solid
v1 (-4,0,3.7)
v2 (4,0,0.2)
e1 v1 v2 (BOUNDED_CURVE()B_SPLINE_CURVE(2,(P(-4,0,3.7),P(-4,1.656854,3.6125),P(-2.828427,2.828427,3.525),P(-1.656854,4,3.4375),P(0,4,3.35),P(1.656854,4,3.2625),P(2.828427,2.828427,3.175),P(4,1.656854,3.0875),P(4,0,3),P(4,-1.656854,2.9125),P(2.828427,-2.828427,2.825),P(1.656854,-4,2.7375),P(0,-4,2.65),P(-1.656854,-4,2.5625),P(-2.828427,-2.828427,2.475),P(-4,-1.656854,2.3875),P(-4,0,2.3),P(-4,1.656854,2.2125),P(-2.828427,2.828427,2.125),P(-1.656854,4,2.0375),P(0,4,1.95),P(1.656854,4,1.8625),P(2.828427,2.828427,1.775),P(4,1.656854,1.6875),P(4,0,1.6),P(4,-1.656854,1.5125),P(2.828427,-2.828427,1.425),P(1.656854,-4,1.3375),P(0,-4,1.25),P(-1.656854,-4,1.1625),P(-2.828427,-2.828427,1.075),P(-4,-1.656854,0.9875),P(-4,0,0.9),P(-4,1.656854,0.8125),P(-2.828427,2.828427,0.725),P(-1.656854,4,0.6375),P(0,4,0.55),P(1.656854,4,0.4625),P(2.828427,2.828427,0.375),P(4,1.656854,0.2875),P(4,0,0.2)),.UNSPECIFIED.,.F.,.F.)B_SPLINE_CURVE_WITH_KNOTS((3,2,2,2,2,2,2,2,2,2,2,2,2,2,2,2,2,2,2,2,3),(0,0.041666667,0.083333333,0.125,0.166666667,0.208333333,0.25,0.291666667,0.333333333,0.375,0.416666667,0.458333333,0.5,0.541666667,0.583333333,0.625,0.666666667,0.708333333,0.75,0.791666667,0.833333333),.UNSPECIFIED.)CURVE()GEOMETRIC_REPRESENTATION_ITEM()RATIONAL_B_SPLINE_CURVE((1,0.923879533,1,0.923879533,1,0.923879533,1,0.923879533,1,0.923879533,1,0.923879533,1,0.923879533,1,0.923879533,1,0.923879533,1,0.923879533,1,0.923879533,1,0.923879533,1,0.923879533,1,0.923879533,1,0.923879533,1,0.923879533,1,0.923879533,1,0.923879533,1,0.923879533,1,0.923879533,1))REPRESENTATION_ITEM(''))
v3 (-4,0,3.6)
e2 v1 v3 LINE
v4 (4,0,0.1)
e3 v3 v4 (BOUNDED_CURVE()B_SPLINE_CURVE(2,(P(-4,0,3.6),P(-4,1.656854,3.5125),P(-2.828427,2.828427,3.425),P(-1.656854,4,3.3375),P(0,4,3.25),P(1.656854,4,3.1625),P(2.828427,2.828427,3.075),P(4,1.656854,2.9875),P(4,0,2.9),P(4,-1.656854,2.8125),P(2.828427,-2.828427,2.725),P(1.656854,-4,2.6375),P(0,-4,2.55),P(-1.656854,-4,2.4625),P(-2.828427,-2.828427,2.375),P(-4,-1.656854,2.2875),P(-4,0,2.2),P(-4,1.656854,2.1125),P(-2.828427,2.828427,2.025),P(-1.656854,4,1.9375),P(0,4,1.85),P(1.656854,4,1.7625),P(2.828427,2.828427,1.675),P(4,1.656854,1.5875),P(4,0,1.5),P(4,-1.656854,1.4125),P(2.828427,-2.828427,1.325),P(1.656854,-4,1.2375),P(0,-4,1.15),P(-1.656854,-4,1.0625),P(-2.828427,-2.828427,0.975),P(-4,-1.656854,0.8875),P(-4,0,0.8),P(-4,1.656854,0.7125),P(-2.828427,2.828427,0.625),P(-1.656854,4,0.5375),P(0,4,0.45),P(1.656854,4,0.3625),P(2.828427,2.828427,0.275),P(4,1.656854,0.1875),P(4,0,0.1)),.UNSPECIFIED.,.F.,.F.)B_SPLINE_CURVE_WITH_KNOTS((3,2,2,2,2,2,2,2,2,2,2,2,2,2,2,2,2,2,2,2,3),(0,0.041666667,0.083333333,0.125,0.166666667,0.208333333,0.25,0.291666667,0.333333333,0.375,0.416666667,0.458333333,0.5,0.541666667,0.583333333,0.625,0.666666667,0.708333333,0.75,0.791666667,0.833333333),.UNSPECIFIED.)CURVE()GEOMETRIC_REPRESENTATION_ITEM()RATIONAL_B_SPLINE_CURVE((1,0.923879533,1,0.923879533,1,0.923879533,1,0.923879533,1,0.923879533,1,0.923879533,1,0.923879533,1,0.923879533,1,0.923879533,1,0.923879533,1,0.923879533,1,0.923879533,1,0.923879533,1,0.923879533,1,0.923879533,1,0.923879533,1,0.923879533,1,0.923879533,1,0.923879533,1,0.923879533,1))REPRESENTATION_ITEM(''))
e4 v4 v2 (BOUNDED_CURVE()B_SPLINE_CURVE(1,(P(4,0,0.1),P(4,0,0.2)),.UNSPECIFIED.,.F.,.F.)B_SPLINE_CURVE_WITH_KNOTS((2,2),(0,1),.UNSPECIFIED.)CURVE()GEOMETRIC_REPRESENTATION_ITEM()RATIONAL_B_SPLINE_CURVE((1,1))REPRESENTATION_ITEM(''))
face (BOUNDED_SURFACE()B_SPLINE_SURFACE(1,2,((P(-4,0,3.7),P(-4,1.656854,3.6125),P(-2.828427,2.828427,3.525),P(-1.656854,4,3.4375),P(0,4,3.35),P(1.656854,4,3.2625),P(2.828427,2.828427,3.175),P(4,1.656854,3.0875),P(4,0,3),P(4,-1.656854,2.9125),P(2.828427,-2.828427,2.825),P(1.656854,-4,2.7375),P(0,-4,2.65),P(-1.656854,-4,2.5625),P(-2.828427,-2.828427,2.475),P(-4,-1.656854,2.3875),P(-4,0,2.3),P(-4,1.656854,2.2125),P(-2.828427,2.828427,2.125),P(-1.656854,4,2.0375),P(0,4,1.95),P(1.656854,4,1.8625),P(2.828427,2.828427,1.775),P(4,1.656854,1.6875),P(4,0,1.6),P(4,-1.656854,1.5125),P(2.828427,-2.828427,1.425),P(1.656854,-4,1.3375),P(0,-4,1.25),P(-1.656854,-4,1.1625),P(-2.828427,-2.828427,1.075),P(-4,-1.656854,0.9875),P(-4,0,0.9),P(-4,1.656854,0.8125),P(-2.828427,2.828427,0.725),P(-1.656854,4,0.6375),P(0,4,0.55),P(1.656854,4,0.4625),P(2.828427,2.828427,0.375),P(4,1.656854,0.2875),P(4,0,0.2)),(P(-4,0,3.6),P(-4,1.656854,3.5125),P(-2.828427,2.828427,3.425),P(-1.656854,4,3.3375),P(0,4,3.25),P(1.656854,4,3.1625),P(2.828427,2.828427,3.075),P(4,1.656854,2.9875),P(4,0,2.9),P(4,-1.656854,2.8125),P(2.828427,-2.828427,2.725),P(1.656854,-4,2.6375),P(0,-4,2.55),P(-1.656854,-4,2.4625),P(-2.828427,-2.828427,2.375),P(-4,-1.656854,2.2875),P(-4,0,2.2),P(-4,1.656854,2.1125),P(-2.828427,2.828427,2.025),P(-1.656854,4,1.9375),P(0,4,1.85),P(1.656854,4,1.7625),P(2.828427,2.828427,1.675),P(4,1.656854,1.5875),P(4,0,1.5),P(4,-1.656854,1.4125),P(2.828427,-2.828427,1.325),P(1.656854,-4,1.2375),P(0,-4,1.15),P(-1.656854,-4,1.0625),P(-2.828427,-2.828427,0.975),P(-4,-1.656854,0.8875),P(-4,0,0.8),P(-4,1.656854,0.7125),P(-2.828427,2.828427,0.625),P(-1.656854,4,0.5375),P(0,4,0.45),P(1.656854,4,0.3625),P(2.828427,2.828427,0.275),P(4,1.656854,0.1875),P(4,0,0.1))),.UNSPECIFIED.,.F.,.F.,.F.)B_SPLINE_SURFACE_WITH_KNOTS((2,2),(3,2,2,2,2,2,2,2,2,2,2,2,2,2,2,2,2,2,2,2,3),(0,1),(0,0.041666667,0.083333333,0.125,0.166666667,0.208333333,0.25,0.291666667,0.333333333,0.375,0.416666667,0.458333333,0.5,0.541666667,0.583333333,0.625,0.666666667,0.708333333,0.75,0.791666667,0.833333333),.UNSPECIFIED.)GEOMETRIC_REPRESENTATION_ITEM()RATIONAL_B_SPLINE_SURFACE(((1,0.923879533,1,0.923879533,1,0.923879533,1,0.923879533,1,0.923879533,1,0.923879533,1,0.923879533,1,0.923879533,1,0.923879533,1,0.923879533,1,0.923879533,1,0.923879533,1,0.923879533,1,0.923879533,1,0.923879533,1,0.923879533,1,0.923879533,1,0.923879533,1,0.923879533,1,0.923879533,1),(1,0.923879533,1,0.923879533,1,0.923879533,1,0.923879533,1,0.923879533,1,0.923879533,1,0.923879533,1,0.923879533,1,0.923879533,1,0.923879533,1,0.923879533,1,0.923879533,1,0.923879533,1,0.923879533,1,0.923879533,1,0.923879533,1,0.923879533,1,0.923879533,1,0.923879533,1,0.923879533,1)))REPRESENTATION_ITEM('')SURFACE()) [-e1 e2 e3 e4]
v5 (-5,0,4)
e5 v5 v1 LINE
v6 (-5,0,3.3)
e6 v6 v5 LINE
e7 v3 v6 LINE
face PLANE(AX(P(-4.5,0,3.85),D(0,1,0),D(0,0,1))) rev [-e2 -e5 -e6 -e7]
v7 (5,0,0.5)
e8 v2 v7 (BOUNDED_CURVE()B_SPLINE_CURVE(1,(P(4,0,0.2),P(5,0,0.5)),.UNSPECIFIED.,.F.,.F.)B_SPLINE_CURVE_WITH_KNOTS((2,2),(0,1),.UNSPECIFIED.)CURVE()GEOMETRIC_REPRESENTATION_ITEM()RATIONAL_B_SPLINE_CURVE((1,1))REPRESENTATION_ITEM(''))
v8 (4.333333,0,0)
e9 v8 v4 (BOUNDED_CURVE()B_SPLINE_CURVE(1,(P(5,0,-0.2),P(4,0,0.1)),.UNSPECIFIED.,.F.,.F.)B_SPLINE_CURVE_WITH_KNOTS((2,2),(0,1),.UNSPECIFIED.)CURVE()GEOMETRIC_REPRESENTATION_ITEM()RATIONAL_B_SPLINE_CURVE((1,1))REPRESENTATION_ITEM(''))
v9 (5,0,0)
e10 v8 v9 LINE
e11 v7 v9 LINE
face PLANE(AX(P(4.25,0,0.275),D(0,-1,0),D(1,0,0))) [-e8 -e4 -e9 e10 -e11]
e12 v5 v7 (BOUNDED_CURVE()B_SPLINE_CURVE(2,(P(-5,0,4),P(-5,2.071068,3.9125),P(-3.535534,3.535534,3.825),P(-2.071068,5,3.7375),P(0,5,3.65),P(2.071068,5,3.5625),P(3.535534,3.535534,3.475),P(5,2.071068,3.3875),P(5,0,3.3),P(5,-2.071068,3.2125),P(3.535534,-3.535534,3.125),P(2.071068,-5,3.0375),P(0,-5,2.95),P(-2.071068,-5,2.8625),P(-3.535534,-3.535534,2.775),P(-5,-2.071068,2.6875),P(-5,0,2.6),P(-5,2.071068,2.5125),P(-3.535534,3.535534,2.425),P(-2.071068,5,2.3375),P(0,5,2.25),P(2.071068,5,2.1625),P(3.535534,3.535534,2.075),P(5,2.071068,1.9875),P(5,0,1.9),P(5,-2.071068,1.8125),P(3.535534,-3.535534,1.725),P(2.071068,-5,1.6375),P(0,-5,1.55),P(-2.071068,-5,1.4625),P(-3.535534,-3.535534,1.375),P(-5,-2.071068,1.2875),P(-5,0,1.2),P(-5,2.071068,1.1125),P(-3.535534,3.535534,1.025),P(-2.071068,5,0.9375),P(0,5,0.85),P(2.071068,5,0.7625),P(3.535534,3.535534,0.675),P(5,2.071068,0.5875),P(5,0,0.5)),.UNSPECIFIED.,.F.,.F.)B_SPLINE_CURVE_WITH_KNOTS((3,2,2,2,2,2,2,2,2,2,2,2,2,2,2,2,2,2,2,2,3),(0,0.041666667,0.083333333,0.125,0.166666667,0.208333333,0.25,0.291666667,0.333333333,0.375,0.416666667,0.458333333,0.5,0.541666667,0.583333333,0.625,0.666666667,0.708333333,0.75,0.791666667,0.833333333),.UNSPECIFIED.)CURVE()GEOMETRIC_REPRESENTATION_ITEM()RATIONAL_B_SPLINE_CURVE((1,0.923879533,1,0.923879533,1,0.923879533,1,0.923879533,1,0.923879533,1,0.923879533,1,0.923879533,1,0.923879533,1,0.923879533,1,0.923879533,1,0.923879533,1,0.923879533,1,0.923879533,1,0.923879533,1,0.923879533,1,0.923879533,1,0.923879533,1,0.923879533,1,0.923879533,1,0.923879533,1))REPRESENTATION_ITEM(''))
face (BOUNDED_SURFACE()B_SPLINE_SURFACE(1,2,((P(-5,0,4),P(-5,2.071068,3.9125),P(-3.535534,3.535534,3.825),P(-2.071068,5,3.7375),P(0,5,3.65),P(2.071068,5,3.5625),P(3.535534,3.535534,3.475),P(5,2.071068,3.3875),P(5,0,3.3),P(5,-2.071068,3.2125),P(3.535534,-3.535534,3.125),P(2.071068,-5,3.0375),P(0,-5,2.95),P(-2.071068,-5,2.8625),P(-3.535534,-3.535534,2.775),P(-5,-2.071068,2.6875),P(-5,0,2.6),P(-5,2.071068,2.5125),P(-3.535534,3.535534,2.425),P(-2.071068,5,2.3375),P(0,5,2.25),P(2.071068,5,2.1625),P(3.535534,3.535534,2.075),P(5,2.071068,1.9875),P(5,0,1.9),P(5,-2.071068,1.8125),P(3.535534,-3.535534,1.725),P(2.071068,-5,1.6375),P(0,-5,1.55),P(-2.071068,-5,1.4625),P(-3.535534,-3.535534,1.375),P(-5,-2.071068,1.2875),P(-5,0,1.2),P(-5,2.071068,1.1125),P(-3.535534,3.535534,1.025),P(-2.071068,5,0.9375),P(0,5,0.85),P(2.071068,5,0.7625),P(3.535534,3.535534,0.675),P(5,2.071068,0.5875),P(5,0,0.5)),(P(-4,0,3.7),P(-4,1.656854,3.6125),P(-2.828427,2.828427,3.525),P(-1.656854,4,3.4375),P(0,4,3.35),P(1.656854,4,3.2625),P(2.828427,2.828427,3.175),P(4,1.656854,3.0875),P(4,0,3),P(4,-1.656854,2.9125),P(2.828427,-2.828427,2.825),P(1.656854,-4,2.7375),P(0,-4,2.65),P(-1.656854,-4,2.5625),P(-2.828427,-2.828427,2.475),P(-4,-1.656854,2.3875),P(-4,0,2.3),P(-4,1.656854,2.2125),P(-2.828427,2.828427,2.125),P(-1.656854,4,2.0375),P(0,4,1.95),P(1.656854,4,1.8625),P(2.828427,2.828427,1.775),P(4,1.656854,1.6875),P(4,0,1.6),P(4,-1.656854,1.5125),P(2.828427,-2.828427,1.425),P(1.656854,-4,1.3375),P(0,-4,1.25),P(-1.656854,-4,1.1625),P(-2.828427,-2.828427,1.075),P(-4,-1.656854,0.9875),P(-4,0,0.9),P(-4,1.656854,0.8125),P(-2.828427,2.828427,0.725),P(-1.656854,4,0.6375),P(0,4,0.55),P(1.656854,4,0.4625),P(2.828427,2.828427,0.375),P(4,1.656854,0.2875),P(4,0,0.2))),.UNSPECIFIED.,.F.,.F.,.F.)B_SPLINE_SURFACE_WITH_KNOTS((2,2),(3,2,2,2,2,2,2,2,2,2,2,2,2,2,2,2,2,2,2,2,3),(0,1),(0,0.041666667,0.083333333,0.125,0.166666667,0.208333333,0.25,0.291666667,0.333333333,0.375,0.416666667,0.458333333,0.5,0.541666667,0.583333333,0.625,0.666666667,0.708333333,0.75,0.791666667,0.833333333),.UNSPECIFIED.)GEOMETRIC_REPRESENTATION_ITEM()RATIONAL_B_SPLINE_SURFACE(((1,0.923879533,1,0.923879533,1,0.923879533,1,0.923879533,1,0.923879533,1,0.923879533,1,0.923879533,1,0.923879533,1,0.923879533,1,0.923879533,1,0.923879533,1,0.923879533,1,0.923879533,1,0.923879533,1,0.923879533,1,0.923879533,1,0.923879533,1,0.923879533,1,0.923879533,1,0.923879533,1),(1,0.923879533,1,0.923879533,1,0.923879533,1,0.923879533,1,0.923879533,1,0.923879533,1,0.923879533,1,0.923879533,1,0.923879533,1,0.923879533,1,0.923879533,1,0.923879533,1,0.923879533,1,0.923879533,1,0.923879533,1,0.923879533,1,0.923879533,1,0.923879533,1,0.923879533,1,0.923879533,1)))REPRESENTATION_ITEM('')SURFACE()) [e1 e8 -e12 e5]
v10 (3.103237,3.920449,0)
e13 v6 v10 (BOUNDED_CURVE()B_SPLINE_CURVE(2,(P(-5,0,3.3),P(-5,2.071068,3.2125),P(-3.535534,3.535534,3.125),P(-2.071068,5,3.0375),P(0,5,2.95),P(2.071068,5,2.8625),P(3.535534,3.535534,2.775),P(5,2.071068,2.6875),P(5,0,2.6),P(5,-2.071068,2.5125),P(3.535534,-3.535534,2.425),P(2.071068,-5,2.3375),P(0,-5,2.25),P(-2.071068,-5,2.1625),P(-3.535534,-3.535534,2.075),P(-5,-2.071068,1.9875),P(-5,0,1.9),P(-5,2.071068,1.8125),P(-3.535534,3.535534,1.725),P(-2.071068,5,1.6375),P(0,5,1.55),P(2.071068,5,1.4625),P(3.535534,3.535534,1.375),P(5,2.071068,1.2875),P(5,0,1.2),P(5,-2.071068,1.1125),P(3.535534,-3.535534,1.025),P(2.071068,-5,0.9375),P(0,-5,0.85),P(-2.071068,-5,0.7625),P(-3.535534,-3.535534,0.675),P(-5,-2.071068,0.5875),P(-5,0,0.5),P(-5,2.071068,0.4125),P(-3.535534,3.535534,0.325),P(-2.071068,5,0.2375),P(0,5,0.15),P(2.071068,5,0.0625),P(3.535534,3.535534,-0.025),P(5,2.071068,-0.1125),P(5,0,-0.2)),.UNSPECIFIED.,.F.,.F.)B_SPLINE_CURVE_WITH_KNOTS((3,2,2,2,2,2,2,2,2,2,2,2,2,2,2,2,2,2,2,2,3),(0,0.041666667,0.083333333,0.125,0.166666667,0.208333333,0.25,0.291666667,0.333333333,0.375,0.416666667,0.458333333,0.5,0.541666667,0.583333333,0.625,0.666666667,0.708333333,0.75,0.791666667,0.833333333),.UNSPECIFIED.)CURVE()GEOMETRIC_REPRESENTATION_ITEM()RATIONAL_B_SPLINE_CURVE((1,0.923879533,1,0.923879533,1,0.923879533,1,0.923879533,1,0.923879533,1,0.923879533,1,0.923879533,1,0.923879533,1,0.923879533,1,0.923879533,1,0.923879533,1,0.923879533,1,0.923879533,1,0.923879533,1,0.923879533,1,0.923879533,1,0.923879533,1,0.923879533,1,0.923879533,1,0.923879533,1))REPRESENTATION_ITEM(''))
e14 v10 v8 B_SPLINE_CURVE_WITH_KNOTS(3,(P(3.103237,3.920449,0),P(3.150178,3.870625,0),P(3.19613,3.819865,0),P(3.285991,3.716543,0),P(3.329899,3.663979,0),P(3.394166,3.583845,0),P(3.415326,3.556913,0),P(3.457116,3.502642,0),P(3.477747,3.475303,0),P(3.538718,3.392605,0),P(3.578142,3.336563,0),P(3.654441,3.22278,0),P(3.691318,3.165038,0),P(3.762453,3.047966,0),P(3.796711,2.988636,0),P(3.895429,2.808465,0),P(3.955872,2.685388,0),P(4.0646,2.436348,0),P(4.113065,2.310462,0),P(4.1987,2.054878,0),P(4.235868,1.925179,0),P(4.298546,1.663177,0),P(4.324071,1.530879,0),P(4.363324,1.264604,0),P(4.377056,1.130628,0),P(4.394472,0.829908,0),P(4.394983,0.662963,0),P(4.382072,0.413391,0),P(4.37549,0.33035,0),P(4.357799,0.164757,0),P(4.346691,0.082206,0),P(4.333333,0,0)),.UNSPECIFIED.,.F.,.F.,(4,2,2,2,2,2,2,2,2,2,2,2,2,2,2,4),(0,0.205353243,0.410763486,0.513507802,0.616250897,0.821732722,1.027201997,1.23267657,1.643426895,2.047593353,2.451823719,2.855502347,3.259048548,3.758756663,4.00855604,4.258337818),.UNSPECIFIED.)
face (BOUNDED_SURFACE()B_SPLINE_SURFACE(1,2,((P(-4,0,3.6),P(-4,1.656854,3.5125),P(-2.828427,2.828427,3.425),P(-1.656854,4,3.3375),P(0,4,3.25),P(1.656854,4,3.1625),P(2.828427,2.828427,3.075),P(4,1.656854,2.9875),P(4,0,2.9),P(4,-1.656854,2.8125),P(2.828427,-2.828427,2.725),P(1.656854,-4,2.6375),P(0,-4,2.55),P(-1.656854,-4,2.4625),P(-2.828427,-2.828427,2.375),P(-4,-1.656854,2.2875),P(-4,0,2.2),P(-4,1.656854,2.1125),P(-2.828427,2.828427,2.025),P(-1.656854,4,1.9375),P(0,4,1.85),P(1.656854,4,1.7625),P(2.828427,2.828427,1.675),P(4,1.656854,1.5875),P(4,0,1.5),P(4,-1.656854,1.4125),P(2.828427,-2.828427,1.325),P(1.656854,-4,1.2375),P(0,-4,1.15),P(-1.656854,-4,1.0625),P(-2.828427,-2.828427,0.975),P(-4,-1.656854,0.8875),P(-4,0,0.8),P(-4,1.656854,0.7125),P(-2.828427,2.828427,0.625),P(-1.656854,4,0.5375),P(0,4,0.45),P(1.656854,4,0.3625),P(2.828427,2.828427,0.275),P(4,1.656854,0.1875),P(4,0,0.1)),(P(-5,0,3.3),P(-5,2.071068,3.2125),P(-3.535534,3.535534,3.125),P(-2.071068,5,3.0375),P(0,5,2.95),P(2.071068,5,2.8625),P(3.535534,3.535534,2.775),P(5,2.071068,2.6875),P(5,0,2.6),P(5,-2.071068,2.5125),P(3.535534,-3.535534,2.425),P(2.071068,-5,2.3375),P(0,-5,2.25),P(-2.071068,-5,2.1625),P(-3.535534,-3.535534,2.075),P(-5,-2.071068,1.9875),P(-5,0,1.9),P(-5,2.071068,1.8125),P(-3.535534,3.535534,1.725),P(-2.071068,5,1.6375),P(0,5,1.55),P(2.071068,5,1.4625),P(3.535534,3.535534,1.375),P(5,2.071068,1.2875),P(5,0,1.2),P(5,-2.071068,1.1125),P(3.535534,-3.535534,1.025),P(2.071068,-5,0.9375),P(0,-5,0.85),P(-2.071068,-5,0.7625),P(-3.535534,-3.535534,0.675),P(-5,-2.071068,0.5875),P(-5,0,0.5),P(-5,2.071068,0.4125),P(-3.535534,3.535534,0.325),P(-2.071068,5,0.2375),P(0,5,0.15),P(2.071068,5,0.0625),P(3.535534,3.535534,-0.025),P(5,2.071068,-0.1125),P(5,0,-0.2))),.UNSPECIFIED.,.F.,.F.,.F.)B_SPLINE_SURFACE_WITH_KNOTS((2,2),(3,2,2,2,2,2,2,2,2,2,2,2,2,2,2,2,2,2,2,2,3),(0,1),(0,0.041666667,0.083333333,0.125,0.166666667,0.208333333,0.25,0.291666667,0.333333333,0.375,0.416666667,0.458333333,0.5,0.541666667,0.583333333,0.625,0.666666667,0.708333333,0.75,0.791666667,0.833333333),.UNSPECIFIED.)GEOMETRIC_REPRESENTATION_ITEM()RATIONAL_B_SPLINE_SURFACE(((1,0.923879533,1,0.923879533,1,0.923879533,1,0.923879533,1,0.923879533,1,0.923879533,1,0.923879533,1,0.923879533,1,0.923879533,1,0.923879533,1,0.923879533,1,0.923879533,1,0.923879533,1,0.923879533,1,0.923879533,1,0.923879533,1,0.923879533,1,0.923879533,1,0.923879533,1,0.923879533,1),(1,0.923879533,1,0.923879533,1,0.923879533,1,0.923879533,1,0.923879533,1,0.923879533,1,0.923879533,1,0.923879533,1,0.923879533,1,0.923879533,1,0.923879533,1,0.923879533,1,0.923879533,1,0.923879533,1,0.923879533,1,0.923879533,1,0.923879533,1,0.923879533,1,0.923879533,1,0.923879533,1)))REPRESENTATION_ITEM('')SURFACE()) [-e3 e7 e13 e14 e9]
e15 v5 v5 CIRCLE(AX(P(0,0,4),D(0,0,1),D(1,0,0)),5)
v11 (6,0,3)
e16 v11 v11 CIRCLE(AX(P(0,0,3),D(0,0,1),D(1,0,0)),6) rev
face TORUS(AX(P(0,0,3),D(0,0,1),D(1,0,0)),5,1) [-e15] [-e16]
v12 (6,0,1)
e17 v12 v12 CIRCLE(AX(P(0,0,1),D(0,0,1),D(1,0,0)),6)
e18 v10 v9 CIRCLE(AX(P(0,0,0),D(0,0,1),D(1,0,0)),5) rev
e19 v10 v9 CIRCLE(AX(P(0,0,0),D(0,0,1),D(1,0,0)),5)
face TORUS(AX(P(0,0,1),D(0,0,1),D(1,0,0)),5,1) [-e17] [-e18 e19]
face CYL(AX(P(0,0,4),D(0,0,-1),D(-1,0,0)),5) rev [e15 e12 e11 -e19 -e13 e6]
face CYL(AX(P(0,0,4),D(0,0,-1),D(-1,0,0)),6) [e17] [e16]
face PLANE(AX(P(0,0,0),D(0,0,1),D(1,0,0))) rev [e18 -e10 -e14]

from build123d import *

# Parameters (mm, degrees)
SZKIC1_R                      = 6
SZKIC1_R_2                    = 5
DODANIE_WYCI_GNI_CIE1_DEPTH   = 4
WYCI_GNI_CIE_PO_CIE_CE2_PITCH = 1.4
SZKIC10_W                     = 16.369764177
SZKIC10_H                     = 8.133619779
SZKIC10_W_2                   = 12
SZKIC10_H_2                   = 4
WYTNIJ_WYCI_GNI_CIE3_DEPTH    = 15
ZAOKR_GLENIE1_R               = 1


with BuildPart() as part:
    # Szkic1 → Dodanie-wyciągnięcie1 (new body)
    with BuildSketch(Plane.XY):
        Circle(SZKIC1_R)
        Circle(SZKIC1_R_2, mode=Mode.SUBTRACT)
    extrude(amount=DODANIE_WYCI_GNI_CIE1_DEPTH)

    # Wyciągnięcie po ścieżce2: the profile of Szkic8 profile screwed along a right-hand helix of 2.5 turns, 8 arcs to a turn; built about Z, then put on its axis
    wyci_gni_cie_po_cie_ce2_z = Axis((0, 0, 0), (0, 0, 1))
    wyci_gni_cie_po_cie_ce2_corners = [(5.0003, 0, 0.70009), (5.0003, 0, -9e-05), (4, 0, 0.3), (4, 0, 0.4)]
    with BuildLine(mode=Mode.PRIVATE) as wyci_gni_cie_po_cie_ce2_profile:
        Line(wyci_gni_cie_po_cie_ce2_corners[0], wyci_gni_cie_po_cie_ce2_corners[1])
        Line(wyci_gni_cie_po_cie_ce2_corners[1], wyci_gni_cie_po_cie_ce2_corners[2])
        Line(wyci_gni_cie_po_cie_ce2_corners[2], wyci_gni_cie_po_cie_ce2_corners[3])
        Line(wyci_gni_cie_po_cie_ce2_corners[3], wyci_gni_cie_po_cie_ce2_corners[0])
    wyci_gni_cie_po_cie_ce2_cap = Face(wyci_gni_cie_po_cie_ce2_profile.wire())
    wyci_gni_cie_po_cie_ce2_turn_angles = [0, 22.5, 45, 67.5, 90, 112.5, 135, 157.5, 180, 202.5, 225, 247.5, 270, 292.5, 315, 337.5, 360]
    wyci_gni_cie_po_cie_ce2_turn_weights = [1, 0.9238795325112867, 1, 0.9238795325112867, 1, 0.9238795325112867, 1, 0.9238795325112867, 1, 0.9238795325112867, 1, 0.9238795325112867, 1, 0.9238795325112867, 1, 0.9238795325112867, 1]
    wyci_gni_cie_po_cie_ce2_turn_rails = [Edge.make_bspline([Vector(p[0], p[1], 0).rotate(wyci_gni_cie_po_cie_ce2_z, wyci_gni_cie_po_cie_ce2_turn_angles[k]) / wyci_gni_cie_po_cie_ce2_turn_weights[k] + Vector(0, 0, p[2] + WYCI_GNI_CIE_PO_CIE_CE2_PITCH * wyci_gni_cie_po_cie_ce2_turn_angles[k] / 360) for k in range(17)], [0, 0, 0, 1, 1, 2, 2, 3, 3, 4, 4, 5, 5, 6, 6, 7, 7, 8, 8, 8], 2, wyci_gni_cie_po_cie_ce2_turn_weights) for p in wyci_gni_cie_po_cie_ce2_corners]
    wyci_gni_cie_po_cie_ce2_turn_sides = [Face.make_surface_from_curves(wyci_gni_cie_po_cie_ce2_turn_rails[p[0]], wyci_gni_cie_po_cie_ce2_turn_rails[p[1]]) for p in [(0, 1), (1, 2), (2, 3), (3, 0)]]
    wyci_gni_cie_po_cie_ce2_last_angles = [720, 742.5, 765, 787.5, 810, 832.5, 855, 877.5, 900]
    wyci_gni_cie_po_cie_ce2_last_weights = [1, 0.9238795325112867, 1, 0.9238795325112867, 1, 0.9238795325112867, 1, 0.9238795325112795, 1]
    wyci_gni_cie_po_cie_ce2_last_rails = [Edge.make_bspline([Vector(p[0], p[1], 0).rotate(wyci_gni_cie_po_cie_ce2_z, wyci_gni_cie_po_cie_ce2_last_angles[k]) / wyci_gni_cie_po_cie_ce2_last_weights[k] + Vector(0, 0, p[2] + WYCI_GNI_CIE_PO_CIE_CE2_PITCH * wyci_gni_cie_po_cie_ce2_last_angles[k] / 360) for k in range(9)], [0, 0, 0, 1, 1, 2, 2, 3, 3, 4, 4, 4], 2, wyci_gni_cie_po_cie_ce2_last_weights) for p in wyci_gni_cie_po_cie_ce2_corners]
    wyci_gni_cie_po_cie_ce2_last_sides = [Face.make_surface_from_curves(wyci_gni_cie_po_cie_ce2_last_rails[p[0]], wyci_gni_cie_po_cie_ce2_last_rails[p[1]]) for p in [(0, 1), (1, 2), (2, 3), (3, 0)]]
    wyci_gni_cie_po_cie_ce2 = Plane(origin=(0, 0, 4), x_dir=(-1, 0, 0), z_dir=(0, 0, -1)) * Solid(Shell([*[p.moved(Location((0, 0, WYCI_GNI_CIE_PO_CIE_CE2_PITCH * i))) for i in range(2) for p in wyci_gni_cie_po_cie_ce2_turn_sides], *wyci_gni_cie_po_cie_ce2_last_sides, wyci_gni_cie_po_cie_ce2_cap, wyci_gni_cie_po_cie_ce2_cap.rotate(wyci_gni_cie_po_cie_ce2_z, 900).moved(Location((0, 0, WYCI_GNI_CIE_PO_CIE_CE2_PITCH * 900 / 360)))]))
    add(wyci_gni_cie_po_cie_ce2)

    # Szkic10 → Wytnij-wyciągnięcie3 (cut)
    with BuildSketch(Plane(origin=(0, 6, 0), x_dir=(1, 0, 0), z_dir=(0, 1, 0))):
        with Locations((-0.154286879, -2.230248785)):
            Rectangle(SZKIC10_W, SZKIC10_H)
        with Locations((0, -2)):
            Rectangle(SZKIC10_W_2, SZKIC10_H_2, mode=Mode.SUBTRACT)
    extrude(amount=-WYTNIJ_WYCI_GNI_CIE3_DEPTH, mode=Mode.SUBTRACT)

    # Zaokrąglenie1
    zaokr_glenie1_edges = [part.edges().sort_by_distance(p)[0] for p in [
        (-6, 0, 0),
        (-6, 0, 4),
    ]]
    fillet(zaokr_glenie1_edges, radius=ZAOKR_GLENIE1_R - 0.0001)  # a hair under: the kernel refuses the full size


solid = part.part
